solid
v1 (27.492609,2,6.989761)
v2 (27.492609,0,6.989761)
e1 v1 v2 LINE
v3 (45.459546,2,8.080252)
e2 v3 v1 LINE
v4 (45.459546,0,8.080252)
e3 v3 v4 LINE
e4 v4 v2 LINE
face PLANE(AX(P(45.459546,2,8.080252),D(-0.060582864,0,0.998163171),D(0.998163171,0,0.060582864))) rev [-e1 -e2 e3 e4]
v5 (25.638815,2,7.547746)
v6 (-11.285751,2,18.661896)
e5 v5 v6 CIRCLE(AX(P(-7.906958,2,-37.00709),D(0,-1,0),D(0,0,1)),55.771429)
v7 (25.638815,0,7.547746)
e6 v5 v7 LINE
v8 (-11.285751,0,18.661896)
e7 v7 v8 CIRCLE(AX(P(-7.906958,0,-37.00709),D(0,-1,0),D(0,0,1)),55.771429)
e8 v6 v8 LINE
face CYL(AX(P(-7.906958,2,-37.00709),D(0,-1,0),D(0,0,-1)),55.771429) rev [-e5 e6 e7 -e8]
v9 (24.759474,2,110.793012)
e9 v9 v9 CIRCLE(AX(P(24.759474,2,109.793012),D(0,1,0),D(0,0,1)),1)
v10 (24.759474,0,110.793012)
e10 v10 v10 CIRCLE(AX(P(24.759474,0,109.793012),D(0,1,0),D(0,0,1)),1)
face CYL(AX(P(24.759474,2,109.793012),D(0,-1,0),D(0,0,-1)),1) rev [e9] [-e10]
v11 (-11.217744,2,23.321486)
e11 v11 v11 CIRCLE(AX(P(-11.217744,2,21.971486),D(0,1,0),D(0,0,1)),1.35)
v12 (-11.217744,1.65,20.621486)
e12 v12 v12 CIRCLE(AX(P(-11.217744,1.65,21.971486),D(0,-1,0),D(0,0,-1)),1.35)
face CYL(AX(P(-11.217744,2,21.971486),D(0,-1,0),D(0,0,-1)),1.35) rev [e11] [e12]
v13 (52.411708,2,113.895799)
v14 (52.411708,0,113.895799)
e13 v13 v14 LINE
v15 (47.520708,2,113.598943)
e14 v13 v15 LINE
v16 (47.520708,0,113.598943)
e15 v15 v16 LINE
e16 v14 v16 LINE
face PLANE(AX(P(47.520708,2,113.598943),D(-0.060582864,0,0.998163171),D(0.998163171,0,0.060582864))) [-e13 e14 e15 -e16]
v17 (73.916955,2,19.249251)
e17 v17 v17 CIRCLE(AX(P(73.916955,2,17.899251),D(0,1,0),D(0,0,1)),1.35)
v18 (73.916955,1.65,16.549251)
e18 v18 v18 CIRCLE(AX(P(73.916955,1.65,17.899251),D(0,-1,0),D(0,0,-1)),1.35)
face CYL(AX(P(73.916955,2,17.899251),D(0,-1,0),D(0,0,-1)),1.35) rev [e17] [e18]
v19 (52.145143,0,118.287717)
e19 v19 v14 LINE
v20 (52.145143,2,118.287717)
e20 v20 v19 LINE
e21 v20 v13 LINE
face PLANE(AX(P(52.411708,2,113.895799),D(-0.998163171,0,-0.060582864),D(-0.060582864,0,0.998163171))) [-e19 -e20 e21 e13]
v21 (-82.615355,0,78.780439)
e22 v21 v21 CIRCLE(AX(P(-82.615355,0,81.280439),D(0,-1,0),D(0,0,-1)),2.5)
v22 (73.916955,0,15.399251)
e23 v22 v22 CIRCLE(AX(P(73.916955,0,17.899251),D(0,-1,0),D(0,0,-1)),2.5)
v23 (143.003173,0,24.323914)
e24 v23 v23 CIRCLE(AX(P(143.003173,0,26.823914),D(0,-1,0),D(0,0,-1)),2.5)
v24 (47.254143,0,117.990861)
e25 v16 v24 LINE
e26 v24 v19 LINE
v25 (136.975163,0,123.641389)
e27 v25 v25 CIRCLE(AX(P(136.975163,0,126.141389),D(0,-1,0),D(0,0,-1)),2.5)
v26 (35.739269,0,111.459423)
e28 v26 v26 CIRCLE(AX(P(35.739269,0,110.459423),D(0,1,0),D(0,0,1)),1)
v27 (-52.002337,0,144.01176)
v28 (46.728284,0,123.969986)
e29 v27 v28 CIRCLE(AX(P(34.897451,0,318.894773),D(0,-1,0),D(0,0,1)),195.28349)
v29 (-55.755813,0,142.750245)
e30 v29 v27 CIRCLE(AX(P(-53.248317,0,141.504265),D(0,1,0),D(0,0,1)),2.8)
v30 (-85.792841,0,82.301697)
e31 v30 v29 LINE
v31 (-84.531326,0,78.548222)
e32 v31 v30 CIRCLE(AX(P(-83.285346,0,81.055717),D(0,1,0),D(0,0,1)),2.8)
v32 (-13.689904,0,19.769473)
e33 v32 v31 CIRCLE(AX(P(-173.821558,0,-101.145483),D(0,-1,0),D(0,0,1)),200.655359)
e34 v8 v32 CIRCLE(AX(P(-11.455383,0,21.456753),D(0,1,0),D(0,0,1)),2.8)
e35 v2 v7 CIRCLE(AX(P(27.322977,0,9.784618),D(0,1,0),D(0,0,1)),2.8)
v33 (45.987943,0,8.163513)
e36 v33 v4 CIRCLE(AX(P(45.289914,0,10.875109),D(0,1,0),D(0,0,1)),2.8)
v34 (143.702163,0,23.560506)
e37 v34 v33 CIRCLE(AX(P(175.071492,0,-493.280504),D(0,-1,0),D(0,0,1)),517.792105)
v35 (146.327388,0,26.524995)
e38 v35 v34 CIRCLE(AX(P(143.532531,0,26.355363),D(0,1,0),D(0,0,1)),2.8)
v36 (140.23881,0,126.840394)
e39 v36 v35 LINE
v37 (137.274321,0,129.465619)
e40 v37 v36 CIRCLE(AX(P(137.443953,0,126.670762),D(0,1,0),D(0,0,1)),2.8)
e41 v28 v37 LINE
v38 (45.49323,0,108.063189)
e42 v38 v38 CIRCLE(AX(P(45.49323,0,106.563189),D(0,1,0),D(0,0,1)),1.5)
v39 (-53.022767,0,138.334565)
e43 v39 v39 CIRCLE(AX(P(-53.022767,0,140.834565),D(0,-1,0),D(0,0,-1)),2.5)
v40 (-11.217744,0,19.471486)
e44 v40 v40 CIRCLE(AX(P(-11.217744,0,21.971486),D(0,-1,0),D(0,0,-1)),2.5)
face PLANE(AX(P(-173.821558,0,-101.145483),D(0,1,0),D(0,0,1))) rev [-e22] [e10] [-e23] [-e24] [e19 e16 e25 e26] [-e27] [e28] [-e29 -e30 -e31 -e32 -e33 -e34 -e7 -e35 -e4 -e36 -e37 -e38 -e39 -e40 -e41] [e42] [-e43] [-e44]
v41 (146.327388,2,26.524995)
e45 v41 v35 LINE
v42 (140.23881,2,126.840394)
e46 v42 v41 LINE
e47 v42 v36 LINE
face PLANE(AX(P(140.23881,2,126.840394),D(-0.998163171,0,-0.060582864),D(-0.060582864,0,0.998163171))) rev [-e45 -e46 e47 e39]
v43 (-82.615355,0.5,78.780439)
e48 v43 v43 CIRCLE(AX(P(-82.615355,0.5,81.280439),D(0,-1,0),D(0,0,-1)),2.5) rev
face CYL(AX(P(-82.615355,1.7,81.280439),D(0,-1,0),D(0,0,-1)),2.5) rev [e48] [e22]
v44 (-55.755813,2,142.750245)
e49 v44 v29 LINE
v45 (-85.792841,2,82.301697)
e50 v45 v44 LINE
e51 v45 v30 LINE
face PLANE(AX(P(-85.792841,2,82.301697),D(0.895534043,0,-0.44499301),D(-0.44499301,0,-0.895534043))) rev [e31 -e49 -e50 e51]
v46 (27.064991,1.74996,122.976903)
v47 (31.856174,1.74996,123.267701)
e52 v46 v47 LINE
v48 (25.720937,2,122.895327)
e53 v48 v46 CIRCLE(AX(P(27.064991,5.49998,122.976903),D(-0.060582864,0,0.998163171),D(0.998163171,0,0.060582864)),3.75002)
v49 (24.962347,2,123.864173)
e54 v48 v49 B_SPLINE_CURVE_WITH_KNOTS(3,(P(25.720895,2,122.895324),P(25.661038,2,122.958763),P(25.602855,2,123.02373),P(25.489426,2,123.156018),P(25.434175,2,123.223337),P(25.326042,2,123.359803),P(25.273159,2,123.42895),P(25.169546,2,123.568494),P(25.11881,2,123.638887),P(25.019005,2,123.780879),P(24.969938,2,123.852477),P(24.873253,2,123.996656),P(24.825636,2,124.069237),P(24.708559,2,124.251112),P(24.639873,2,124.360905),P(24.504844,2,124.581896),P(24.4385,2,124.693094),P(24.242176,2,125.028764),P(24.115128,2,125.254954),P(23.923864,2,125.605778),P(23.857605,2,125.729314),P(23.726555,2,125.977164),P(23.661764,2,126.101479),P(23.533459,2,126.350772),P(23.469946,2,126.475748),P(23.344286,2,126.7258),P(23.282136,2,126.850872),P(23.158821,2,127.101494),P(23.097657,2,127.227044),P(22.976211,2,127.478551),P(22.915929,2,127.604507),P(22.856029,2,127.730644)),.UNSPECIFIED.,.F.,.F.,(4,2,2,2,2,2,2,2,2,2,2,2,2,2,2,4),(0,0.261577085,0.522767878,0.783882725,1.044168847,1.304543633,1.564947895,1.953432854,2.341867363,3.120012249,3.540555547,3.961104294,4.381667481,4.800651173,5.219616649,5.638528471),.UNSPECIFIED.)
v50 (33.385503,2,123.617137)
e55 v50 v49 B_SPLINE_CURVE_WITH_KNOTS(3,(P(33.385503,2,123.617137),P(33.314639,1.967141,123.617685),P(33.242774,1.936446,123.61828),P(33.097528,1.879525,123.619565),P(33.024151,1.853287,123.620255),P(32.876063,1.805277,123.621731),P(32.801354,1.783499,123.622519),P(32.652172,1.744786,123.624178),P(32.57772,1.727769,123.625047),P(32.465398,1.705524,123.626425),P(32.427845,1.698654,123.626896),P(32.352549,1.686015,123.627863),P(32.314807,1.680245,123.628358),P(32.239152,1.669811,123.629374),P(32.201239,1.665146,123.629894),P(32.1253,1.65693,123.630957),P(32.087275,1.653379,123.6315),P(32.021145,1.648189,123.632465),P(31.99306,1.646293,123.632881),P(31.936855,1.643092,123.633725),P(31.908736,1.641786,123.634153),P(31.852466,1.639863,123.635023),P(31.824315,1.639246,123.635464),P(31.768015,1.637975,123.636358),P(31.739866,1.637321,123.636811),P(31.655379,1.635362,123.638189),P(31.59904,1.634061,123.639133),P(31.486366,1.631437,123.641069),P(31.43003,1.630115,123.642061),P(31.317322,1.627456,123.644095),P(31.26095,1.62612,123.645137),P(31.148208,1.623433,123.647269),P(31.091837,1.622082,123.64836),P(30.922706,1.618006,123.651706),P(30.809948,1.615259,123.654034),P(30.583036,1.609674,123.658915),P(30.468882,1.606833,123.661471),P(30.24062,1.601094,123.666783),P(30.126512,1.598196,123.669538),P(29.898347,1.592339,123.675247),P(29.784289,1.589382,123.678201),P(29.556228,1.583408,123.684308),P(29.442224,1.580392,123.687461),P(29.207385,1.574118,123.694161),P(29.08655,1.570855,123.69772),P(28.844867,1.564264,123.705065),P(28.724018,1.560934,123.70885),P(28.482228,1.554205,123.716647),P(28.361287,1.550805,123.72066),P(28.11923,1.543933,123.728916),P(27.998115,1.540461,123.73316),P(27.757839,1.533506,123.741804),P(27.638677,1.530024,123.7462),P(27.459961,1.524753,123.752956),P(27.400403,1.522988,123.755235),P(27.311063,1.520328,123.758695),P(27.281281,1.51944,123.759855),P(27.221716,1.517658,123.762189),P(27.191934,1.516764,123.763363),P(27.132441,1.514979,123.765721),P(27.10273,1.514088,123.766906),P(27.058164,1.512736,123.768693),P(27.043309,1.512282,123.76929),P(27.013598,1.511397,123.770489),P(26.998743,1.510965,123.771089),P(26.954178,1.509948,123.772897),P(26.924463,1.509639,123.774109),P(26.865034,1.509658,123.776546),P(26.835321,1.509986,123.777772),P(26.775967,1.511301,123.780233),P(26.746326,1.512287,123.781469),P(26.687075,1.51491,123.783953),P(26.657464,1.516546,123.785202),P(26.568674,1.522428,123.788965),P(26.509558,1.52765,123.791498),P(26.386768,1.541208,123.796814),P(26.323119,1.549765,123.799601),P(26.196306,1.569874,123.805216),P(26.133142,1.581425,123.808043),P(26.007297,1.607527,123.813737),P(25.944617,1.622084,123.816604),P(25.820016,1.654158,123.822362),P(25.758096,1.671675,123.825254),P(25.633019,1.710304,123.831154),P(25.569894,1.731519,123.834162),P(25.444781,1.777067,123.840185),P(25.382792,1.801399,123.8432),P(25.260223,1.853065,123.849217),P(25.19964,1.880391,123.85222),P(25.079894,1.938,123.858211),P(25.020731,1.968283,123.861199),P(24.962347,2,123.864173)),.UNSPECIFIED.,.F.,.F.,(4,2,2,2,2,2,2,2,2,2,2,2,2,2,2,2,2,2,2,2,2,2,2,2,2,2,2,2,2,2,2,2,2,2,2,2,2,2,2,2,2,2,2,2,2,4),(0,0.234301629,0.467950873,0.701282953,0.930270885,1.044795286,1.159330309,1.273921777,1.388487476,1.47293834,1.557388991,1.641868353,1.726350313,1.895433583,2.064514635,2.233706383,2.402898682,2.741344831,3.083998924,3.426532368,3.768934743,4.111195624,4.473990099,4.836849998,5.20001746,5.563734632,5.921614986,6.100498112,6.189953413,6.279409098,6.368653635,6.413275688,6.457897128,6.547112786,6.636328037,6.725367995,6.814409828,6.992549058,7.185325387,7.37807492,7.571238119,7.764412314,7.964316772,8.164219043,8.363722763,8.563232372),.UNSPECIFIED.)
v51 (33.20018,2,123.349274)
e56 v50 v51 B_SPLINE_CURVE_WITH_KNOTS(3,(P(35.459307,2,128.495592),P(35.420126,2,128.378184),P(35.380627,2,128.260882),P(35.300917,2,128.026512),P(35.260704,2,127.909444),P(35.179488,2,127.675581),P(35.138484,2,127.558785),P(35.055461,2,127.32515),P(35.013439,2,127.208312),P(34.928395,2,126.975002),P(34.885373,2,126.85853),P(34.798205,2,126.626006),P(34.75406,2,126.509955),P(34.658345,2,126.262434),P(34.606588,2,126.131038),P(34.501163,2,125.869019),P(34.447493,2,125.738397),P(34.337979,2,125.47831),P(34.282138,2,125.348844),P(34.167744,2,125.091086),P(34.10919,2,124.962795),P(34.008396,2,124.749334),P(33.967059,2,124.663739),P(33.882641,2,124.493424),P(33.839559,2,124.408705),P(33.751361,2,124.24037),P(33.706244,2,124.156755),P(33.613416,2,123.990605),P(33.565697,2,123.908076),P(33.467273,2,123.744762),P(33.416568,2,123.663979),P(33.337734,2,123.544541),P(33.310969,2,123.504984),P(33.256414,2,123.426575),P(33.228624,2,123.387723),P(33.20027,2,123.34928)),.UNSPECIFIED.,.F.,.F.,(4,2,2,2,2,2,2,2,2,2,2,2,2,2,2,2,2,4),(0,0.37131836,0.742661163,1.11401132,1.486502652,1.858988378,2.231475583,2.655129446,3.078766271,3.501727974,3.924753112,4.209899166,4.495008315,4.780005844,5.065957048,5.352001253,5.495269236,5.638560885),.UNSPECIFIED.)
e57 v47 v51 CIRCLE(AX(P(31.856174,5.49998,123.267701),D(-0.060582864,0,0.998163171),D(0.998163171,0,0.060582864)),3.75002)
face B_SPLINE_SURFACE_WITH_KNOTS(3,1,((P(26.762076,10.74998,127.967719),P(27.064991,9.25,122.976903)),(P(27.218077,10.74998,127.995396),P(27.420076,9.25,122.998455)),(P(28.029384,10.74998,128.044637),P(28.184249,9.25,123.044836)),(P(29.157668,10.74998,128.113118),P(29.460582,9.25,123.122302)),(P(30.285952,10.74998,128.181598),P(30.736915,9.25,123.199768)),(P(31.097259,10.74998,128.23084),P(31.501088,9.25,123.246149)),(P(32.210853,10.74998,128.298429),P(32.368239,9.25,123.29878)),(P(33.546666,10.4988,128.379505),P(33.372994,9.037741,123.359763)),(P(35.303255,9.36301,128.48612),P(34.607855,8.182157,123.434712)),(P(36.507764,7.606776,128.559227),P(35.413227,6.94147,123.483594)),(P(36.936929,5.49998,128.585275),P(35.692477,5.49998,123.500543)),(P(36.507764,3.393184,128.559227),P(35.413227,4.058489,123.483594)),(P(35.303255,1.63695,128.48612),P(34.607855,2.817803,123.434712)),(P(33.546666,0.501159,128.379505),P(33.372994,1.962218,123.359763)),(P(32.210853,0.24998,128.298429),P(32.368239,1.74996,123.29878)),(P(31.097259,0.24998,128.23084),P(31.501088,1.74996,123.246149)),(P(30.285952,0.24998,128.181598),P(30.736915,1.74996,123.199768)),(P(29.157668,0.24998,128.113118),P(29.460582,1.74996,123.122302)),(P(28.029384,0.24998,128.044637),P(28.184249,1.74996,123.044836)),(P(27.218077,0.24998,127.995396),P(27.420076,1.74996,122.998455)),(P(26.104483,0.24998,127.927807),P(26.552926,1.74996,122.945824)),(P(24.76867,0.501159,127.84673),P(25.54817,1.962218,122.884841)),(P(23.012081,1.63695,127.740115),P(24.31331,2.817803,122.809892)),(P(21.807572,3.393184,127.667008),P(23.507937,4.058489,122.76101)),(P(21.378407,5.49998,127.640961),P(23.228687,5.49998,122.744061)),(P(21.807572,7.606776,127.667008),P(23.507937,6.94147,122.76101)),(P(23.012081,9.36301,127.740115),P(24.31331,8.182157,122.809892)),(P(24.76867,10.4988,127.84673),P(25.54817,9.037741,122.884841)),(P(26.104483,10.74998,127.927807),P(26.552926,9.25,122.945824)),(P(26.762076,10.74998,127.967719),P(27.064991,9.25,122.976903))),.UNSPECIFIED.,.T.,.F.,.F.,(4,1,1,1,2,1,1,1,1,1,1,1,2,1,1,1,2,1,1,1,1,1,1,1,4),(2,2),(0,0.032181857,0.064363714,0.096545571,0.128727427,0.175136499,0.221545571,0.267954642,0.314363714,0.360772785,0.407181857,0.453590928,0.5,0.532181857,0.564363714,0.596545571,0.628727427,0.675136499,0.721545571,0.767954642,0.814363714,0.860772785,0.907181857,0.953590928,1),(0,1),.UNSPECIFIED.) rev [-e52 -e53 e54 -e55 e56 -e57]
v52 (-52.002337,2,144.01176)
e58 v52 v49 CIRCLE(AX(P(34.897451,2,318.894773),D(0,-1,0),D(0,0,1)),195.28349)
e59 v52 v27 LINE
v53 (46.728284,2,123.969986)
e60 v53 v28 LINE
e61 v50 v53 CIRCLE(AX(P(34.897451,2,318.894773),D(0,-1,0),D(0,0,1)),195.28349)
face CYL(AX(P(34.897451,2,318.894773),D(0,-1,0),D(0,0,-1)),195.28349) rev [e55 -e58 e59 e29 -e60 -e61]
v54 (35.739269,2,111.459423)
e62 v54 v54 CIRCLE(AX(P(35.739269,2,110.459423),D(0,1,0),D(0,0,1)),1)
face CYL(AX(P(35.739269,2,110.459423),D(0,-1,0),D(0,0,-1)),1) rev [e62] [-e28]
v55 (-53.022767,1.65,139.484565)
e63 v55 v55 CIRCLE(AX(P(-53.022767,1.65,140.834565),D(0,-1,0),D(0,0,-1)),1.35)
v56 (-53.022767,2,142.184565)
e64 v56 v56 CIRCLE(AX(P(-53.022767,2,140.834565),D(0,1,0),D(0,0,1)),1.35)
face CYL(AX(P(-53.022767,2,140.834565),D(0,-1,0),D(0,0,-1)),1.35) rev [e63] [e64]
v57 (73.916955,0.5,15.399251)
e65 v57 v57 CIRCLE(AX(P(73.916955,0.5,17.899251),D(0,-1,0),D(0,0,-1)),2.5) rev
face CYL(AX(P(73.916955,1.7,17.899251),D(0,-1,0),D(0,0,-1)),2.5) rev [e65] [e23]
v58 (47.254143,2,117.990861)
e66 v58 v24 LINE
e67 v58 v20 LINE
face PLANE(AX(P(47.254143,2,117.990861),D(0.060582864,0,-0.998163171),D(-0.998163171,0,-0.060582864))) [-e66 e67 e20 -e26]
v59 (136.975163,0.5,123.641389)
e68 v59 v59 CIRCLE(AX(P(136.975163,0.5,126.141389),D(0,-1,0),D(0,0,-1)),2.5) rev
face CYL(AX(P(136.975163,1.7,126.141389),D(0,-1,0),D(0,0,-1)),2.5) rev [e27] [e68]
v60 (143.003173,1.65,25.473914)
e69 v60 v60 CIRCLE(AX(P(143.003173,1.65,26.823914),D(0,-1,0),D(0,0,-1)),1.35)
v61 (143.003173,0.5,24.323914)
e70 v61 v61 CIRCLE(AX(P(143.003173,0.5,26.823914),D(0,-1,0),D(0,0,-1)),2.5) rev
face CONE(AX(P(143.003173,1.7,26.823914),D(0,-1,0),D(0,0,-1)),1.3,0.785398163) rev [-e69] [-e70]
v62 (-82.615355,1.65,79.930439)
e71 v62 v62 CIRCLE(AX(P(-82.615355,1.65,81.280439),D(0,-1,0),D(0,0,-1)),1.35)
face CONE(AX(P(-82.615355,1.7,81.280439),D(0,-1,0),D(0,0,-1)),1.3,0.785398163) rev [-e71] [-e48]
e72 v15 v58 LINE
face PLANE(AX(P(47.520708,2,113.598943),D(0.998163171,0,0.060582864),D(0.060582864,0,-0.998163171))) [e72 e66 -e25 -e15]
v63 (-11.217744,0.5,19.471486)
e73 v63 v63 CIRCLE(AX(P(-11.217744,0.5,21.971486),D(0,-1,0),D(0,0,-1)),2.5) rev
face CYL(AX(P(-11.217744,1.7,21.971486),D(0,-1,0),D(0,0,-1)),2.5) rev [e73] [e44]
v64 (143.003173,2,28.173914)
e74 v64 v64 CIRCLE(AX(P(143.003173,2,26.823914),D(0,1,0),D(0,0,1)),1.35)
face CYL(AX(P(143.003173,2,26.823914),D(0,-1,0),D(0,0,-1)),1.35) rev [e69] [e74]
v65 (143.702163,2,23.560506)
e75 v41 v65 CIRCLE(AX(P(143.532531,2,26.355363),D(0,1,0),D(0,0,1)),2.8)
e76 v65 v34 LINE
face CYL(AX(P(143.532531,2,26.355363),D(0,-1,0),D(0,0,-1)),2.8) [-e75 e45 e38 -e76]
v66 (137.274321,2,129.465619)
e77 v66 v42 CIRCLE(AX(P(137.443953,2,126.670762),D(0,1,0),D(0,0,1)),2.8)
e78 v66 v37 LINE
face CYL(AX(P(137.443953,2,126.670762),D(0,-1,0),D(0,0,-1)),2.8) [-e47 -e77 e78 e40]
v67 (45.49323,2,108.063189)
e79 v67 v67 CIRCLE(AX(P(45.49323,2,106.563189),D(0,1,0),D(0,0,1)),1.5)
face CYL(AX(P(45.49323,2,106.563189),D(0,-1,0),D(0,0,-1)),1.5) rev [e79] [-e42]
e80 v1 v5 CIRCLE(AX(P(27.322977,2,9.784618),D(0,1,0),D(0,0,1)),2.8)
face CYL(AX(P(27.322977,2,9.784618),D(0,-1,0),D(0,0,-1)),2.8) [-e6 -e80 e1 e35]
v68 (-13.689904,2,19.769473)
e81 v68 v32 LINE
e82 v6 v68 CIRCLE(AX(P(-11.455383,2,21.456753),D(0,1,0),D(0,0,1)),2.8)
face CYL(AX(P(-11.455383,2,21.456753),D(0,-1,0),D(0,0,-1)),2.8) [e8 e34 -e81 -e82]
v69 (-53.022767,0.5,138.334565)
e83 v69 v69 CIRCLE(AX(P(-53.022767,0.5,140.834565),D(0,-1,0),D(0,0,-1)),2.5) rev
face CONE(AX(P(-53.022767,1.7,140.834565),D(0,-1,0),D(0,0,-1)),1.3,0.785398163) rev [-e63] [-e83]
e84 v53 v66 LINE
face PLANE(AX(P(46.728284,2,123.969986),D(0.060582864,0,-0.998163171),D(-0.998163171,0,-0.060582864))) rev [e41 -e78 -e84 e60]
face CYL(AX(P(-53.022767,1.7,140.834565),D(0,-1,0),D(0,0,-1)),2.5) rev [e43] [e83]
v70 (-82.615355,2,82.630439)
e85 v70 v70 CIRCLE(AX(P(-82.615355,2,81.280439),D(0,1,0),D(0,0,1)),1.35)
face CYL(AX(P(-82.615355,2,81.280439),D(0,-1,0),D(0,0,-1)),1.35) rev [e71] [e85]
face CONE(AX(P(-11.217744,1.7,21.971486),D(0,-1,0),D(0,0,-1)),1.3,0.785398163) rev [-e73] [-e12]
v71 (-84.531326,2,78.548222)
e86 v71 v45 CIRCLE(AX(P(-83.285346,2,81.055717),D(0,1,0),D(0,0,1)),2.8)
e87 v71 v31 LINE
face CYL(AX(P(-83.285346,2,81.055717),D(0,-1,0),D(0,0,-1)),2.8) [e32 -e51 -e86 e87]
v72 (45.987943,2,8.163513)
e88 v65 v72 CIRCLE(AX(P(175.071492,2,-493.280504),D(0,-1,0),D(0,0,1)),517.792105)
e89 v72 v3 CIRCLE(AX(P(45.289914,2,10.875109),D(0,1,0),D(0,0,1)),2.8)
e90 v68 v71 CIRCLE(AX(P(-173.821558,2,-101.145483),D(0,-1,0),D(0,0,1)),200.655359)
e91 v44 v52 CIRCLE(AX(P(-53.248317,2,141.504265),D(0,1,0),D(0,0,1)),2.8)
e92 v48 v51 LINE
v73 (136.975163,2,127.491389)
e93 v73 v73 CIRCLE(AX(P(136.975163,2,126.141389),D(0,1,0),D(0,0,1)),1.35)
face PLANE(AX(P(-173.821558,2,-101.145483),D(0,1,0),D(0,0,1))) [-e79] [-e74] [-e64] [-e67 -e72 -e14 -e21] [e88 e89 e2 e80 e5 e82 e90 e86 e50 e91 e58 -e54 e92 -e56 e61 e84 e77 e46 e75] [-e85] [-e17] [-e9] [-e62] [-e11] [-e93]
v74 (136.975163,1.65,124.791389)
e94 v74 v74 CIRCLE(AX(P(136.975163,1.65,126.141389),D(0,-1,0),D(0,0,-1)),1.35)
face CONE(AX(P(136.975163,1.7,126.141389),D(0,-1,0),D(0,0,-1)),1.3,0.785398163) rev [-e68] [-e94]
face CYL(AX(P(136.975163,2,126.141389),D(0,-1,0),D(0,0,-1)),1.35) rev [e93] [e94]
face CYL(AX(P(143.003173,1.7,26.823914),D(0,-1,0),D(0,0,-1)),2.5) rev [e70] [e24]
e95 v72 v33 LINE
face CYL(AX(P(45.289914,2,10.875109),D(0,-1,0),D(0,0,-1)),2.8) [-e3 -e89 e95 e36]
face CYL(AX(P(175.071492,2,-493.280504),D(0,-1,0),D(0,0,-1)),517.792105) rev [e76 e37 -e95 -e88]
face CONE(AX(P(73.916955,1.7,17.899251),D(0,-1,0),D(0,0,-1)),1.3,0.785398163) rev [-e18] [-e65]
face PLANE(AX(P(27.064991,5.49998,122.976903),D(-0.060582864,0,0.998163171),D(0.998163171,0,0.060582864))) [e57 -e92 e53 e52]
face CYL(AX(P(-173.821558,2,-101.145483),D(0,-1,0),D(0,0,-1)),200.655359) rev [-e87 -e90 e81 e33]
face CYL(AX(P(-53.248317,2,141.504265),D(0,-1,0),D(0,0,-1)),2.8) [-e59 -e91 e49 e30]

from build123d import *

# Parameters (mm, degrees)
SKETCH1_R                = 1
SKETCH1_R_2              = 1.5
SKETCH1_R_3              = 1.35
MAIN_PLATE_DEPTH         = 2
SKETCH2_R                = 2.5
SCREW_HOLES_DEPTH        = 1.7
SCREW_HOLES_CHAMFER_SIZE = 1.2


with BuildPart() as part:
    # Sketch1 → Main_plate (new body)
    with BuildSketch(Plane(origin=(0, 0, 0), x_dir=(1, 0, 0), z_dir=(0, 1, 0))):
        with BuildLine():
            Line((-85.7928409, -82.301697444), (-55.755812757, -142.75024532))
            ThreePointArc((-55.755812757, -142.75024532), (-54.140343173, -144.158373046), (-52.002337011, -144.011760212))
            ThreePointArc((-52.002337011, -144.011760212), (-3.951682628, -127.514559525), (46.728283967, -123.969985789))
            Line((46.728283967, -123.969985789), (137.274321343, -129.465618584))
            ThreePointArc((137.274321343, -129.465618584), (139.300267663, -128.766971907), (140.238810242, -126.840393723))
            Line((140.238810242, -126.840393723), (146.327388064, -26.524995005))
            ThreePointArc((146.327388064, -26.524995005), (145.628741387, -24.499048684), (143.702163203, -23.560506106))
            ThreePointArc((143.702163203, -23.560506106), (94.476527457, -18.20079206), (45.987943487, -8.163512858))
            ThreePointArc((45.987943487, -8.163512858), (45.725737799, -8.109235511), (45.459546448, -8.080252452))
            Line((45.459546448, -8.080252452), (27.492609364, -6.989760902))
            ThreePointArc((27.492609364, -6.989760902), (26.515953382, -7.103440368), (25.638814565, -7.547745919))
            ThreePointArc((25.638814565, -7.547745919), (8.167641381, -16.397587105), (-11.285751241, -18.661896472))
            ThreePointArc((-11.285751241, -18.661896472), (-12.626973233, -18.913649552), (-13.689904343, -19.76947284))
            ThreePointArc((-13.689904343, -19.76947284), (-45.694454746, -53.276077835), (-84.531326007, -78.548221698))
            ThreePointArc((-84.531326007, -78.548221698), (-85.939453733, -80.163691282), (-85.7928409, -82.301697444))
        make_face()
        with Locations(Location((24.759473712, -109.793011675, 0), (0, 0, 270))):
            Circle(SKETCH1_R, mode=Mode.SUBTRACT)
        with Locations(Location((35.739268597, -110.459423178, 0), (0, 0, 270))):
            Circle(SKETCH1_R, mode=Mode.SUBTRACT)
        with Locations(Location((45.493229955, -106.563189377, 0), (0, 0, 270))):
            Circle(SKETCH1_R_2, mode=Mode.SUBTRACT)
        with Locations(Location((143.003172699, -26.823913699, 0), (0, 0, 270))):
            Circle(SKETCH1_R_3, mode=Mode.SUBTRACT)
        with Locations(Location((73.916954773, -17.899251104, 0), (0, 0, 270))):
            Circle(SKETCH1_R_3, mode=Mode.SUBTRACT)
        with Locations(Location((-11.217743895, -21.971485999, 0), (0, 0, 270))):
            Circle(SKETCH1_R_3, mode=Mode.SUBTRACT)
        with Locations(Location((-82.615354782, -81.280438678, 0), (0, 0, 270))):
            Circle(SKETCH1_R_3, mode=Mode.SUBTRACT)
        with Locations(Location((-53.022766816, -140.834565069, 0), (0, 0, 270))):
            Circle(SKETCH1_R_3, mode=Mode.SUBTRACT)
        with Locations(Location((136.975163208, -126.141388687, 0), (0, 0, 270))):
            Circle(SKETCH1_R_3, mode=Mode.SUBTRACT)
        Polygon((47.520707964, -113.598943276), (52.411707503, -113.895799309), (52.145142902, -118.287717263), (47.254143363, -117.99086123), align=None, mode=Mode.SUBTRACT)
    extrude(amount=MAIN_PLATE_DEPTH)

    # Sketch2 → Screw_holes (cut)
    with BuildSketch(Plane.XZ):
        with Locations(Location((136.975163208, 126.141388687, 0), (0, 0, 270))):
            Circle(SKETCH2_R)
        with Locations(Location((-53.022766816, 140.834565069, 0), (0, 0, 270))):
            Circle(SKETCH2_R)
        with Locations(Location((-82.615354782, 81.280438678, 0), (0, 0, 270))):
            Circle(SKETCH2_R)
        with Locations(Location((-11.217743895, 21.971485999, 0), (0, 0, 270))):
            Circle(SKETCH2_R)
        with Locations(Location((73.916954773, 17.899251104, 0), (0, 0, 270))):
            Circle(SKETCH2_R)
        with Locations(Location((143.003172699, 26.823913699, 0), (0, 0, 270))):
            Circle(SKETCH2_R)
    extrude(amount=-SCREW_HOLES_DEPTH, mode=Mode.SUBTRACT)

    # Screw_holes_chamfer
    # the kernel refuses this chamfer: 1.2 mm, written as the material it adds along each edge
    with BuildSketch(Plane(origin=(143.003172699, 1.7, 26.823913699), x_dir=(0, 0, -1), z_dir=(-1, 0, 0))) as screw_holes_chamfer_piece_1_section:
        Polygon((2.5, SCREW_HOLES_CHAMFER_SIZE), (2.5 - SCREW_HOLES_CHAMFER_SIZE, 0), (2.5, 0), align=None)
    screw_holes_chamfer_piece_1 = revolve(axis=Axis((143.003172699, 1.7, 26.823913699), (0, -1, 0)), mode=Mode.PRIVATE)
    screw_holes_chamfer_piece_1 = screw_holes_chamfer_piece_1 - Plane(origin=(143.003172699, 1.073479929, 26.823913699), x_dir=(0, 0, 1), z_dir=(0, -1, 0)) * Cylinder(1.35, 10, mode=Mode.PRIVATE)
    add(screw_holes_chamfer_piece_1)
    with BuildSketch(Plane(origin=(73.916954773, 1.7, 17.899251104), x_dir=(0, 0, -1), z_dir=(-1, 0, 0))) as screw_holes_chamfer_piece_2_section:
        Polygon((2.5, SCREW_HOLES_CHAMFER_SIZE), (2.5 - SCREW_HOLES_CHAMFER_SIZE, 0), (2.5, 0), align=None)
    screw_holes_chamfer_piece_2 = revolve(axis=Axis((73.916954773, 1.7, 17.899251104), (0, -1, 0)), mode=Mode.PRIVATE)
    screw_holes_chamfer_piece_2 = screw_holes_chamfer_piece_2 - Plane(origin=(73.916954773, 1.073479929, 17.899251104), x_dir=(0, 0, 1), z_dir=(0, -1, 0)) * Cylinder(1.35, 10, mode=Mode.PRIVATE)
    add(screw_holes_chamfer_piece_2)
    with BuildSketch(Plane(origin=(-11.217743895, 1.7, 21.971485999), x_dir=(0, 0, -1), z_dir=(-1, 0, 0))) as screw_holes_chamfer_piece_3_section:
        Polygon((2.5, SCREW_HOLES_CHAMFER_SIZE), (2.5 - SCREW_HOLES_CHAMFER_SIZE, 0), (2.5, 0), align=None)
    screw_holes_chamfer_piece_3 = revolve(axis=Axis((-11.217743895, 1.7, 21.971485999), (0, -1, 0)), mode=Mode.PRIVATE)
    screw_holes_chamfer_piece_3 = screw_holes_chamfer_piece_3 - Plane(origin=(-11.217743895, 1.073479929, 21.971485999), x_dir=(0, 0, 1), z_dir=(0, -1, 0)) * Cylinder(1.35, 10, mode=Mode.PRIVATE)
    add(screw_holes_chamfer_piece_3)
    with BuildSketch(Plane(origin=(-82.615354782, 1.7, 81.280438678), x_dir=(0, 0, -1), z_dir=(-1, 0, 0))) as screw_holes_chamfer_piece_4_section:
        Polygon((2.5, SCREW_HOLES_CHAMFER_SIZE), (2.5 - SCREW_HOLES_CHAMFER_SIZE, 0), (2.5, 0), align=None)
    screw_holes_chamfer_piece_4 = revolve(axis=Axis((-82.615354782, 1.7, 81.280438678), (0, -1, 0)), mode=Mode.PRIVATE)
    screw_holes_chamfer_piece_4 = screw_holes_chamfer_piece_4 - Plane(origin=(-82.615354782, 1.073479929, 81.280438678), x_dir=(0, 0, 1), z_dir=(0, -1, 0)) * Cylinder(1.35, 11, mode=Mode.PRIVATE)
    add(screw_holes_chamfer_piece_4)
    with BuildSketch(Plane(origin=(-53.022766816, 1.7, 140.834565069), x_dir=(0, 0, -1), z_dir=(-1, 0, 0))) as screw_holes_chamfer_piece_5_section:
        Polygon((2.5, SCREW_HOLES_CHAMFER_SIZE), (2.5 - SCREW_HOLES_CHAMFER_SIZE, 0), (2.5, 0), align=None)
    screw_holes_chamfer_piece_5 = revolve(axis=Axis((-53.022766816, 1.7, 140.834565069), (0, -1, 0)), mode=Mode.PRIVATE)
    screw_holes_chamfer_piece_5 = screw_holes_chamfer_piece_5 - Plane(origin=(-53.022766816, 1.073479929, 140.834565069), x_dir=(0, 0, 1), z_dir=(0, -1, 0)) * Cylinder(1.35, 10, mode=Mode.PRIVATE)
    add(screw_holes_chamfer_piece_5)
    with BuildSketch(Plane(origin=(136.975163208, 1.7, 126.141388687), x_dir=(0, 0, -1), z_dir=(-1, 0, 0))) as screw_holes_chamfer_piece_6_section:
        Polygon((2.5, SCREW_HOLES_CHAMFER_SIZE), (2.5 - SCREW_HOLES_CHAMFER_SIZE, 0), (2.5, 0), align=None)
    screw_holes_chamfer_piece_6 = revolve(axis=Axis((136.975163208, 1.7, 126.141388687), (0, -1, 0)), mode=Mode.PRIVATE)
    screw_holes_chamfer_piece_6 = screw_holes_chamfer_piece_6 - Plane(origin=(136.975163208, 1.073479929, 126.141388687), x_dir=(0, 0, 1), z_dir=(0, -1, 0)) * Cylinder(1.35, 10, mode=Mode.PRIVATE)
    add(screw_holes_chamfer_piece_6)

    # Sketch4 → Cut-Loft1 section 0
    with BuildSketch(Plane(origin=(-7.640186202, 0, 125.879695971), x_dir=(0.9981631713309721, 0, 0.060582863901407005), z_dir=(-0.060582863901407005, 0, 0.9981631713309721))):
        with BuildLine():
            Line((34.465569885, 10.749979768), (39.265569885, 10.749979768))
            ThreePointArc((39.265569885, 10.749979768), (44.515569885, 5.499979768), (39.265569885, 0.249979768))
            Line((39.265569885, 0.249979768), (34.465569885, 0.249979768))
            ThreePointArc((34.465569885, 0.249979768), (29.215569885, 5.499979768), (34.465569885, 10.749979768))
        make_face()
    # Sketch3 → Cut-Loft1 section 1
    with BuildSketch(Plane(origin=(-7.337271882, 0, 120.888880114), x_dir=(0.9981631713309721, 0, 0.060582863901407005), z_dir=(-0.060582863901407005, 0, 0.9981631713309721))):
        with BuildLine():
            Line((34.465569885, 9.25), (39.265569885, 9.25))
            ThreePointArc((39.265569885, 9.25), (43.015590117, 5.499979768), (39.265569885, 1.749959536))
            Line((39.265569885, 1.749959536), (34.465569885, 1.749959536))
            ThreePointArc((34.465569885, 1.749959536), (30.715549653, 5.499979768), (34.465569885, 9.25))
        make_face()
    loft(mode=Mode.SUBTRACT)


solid = part.part
